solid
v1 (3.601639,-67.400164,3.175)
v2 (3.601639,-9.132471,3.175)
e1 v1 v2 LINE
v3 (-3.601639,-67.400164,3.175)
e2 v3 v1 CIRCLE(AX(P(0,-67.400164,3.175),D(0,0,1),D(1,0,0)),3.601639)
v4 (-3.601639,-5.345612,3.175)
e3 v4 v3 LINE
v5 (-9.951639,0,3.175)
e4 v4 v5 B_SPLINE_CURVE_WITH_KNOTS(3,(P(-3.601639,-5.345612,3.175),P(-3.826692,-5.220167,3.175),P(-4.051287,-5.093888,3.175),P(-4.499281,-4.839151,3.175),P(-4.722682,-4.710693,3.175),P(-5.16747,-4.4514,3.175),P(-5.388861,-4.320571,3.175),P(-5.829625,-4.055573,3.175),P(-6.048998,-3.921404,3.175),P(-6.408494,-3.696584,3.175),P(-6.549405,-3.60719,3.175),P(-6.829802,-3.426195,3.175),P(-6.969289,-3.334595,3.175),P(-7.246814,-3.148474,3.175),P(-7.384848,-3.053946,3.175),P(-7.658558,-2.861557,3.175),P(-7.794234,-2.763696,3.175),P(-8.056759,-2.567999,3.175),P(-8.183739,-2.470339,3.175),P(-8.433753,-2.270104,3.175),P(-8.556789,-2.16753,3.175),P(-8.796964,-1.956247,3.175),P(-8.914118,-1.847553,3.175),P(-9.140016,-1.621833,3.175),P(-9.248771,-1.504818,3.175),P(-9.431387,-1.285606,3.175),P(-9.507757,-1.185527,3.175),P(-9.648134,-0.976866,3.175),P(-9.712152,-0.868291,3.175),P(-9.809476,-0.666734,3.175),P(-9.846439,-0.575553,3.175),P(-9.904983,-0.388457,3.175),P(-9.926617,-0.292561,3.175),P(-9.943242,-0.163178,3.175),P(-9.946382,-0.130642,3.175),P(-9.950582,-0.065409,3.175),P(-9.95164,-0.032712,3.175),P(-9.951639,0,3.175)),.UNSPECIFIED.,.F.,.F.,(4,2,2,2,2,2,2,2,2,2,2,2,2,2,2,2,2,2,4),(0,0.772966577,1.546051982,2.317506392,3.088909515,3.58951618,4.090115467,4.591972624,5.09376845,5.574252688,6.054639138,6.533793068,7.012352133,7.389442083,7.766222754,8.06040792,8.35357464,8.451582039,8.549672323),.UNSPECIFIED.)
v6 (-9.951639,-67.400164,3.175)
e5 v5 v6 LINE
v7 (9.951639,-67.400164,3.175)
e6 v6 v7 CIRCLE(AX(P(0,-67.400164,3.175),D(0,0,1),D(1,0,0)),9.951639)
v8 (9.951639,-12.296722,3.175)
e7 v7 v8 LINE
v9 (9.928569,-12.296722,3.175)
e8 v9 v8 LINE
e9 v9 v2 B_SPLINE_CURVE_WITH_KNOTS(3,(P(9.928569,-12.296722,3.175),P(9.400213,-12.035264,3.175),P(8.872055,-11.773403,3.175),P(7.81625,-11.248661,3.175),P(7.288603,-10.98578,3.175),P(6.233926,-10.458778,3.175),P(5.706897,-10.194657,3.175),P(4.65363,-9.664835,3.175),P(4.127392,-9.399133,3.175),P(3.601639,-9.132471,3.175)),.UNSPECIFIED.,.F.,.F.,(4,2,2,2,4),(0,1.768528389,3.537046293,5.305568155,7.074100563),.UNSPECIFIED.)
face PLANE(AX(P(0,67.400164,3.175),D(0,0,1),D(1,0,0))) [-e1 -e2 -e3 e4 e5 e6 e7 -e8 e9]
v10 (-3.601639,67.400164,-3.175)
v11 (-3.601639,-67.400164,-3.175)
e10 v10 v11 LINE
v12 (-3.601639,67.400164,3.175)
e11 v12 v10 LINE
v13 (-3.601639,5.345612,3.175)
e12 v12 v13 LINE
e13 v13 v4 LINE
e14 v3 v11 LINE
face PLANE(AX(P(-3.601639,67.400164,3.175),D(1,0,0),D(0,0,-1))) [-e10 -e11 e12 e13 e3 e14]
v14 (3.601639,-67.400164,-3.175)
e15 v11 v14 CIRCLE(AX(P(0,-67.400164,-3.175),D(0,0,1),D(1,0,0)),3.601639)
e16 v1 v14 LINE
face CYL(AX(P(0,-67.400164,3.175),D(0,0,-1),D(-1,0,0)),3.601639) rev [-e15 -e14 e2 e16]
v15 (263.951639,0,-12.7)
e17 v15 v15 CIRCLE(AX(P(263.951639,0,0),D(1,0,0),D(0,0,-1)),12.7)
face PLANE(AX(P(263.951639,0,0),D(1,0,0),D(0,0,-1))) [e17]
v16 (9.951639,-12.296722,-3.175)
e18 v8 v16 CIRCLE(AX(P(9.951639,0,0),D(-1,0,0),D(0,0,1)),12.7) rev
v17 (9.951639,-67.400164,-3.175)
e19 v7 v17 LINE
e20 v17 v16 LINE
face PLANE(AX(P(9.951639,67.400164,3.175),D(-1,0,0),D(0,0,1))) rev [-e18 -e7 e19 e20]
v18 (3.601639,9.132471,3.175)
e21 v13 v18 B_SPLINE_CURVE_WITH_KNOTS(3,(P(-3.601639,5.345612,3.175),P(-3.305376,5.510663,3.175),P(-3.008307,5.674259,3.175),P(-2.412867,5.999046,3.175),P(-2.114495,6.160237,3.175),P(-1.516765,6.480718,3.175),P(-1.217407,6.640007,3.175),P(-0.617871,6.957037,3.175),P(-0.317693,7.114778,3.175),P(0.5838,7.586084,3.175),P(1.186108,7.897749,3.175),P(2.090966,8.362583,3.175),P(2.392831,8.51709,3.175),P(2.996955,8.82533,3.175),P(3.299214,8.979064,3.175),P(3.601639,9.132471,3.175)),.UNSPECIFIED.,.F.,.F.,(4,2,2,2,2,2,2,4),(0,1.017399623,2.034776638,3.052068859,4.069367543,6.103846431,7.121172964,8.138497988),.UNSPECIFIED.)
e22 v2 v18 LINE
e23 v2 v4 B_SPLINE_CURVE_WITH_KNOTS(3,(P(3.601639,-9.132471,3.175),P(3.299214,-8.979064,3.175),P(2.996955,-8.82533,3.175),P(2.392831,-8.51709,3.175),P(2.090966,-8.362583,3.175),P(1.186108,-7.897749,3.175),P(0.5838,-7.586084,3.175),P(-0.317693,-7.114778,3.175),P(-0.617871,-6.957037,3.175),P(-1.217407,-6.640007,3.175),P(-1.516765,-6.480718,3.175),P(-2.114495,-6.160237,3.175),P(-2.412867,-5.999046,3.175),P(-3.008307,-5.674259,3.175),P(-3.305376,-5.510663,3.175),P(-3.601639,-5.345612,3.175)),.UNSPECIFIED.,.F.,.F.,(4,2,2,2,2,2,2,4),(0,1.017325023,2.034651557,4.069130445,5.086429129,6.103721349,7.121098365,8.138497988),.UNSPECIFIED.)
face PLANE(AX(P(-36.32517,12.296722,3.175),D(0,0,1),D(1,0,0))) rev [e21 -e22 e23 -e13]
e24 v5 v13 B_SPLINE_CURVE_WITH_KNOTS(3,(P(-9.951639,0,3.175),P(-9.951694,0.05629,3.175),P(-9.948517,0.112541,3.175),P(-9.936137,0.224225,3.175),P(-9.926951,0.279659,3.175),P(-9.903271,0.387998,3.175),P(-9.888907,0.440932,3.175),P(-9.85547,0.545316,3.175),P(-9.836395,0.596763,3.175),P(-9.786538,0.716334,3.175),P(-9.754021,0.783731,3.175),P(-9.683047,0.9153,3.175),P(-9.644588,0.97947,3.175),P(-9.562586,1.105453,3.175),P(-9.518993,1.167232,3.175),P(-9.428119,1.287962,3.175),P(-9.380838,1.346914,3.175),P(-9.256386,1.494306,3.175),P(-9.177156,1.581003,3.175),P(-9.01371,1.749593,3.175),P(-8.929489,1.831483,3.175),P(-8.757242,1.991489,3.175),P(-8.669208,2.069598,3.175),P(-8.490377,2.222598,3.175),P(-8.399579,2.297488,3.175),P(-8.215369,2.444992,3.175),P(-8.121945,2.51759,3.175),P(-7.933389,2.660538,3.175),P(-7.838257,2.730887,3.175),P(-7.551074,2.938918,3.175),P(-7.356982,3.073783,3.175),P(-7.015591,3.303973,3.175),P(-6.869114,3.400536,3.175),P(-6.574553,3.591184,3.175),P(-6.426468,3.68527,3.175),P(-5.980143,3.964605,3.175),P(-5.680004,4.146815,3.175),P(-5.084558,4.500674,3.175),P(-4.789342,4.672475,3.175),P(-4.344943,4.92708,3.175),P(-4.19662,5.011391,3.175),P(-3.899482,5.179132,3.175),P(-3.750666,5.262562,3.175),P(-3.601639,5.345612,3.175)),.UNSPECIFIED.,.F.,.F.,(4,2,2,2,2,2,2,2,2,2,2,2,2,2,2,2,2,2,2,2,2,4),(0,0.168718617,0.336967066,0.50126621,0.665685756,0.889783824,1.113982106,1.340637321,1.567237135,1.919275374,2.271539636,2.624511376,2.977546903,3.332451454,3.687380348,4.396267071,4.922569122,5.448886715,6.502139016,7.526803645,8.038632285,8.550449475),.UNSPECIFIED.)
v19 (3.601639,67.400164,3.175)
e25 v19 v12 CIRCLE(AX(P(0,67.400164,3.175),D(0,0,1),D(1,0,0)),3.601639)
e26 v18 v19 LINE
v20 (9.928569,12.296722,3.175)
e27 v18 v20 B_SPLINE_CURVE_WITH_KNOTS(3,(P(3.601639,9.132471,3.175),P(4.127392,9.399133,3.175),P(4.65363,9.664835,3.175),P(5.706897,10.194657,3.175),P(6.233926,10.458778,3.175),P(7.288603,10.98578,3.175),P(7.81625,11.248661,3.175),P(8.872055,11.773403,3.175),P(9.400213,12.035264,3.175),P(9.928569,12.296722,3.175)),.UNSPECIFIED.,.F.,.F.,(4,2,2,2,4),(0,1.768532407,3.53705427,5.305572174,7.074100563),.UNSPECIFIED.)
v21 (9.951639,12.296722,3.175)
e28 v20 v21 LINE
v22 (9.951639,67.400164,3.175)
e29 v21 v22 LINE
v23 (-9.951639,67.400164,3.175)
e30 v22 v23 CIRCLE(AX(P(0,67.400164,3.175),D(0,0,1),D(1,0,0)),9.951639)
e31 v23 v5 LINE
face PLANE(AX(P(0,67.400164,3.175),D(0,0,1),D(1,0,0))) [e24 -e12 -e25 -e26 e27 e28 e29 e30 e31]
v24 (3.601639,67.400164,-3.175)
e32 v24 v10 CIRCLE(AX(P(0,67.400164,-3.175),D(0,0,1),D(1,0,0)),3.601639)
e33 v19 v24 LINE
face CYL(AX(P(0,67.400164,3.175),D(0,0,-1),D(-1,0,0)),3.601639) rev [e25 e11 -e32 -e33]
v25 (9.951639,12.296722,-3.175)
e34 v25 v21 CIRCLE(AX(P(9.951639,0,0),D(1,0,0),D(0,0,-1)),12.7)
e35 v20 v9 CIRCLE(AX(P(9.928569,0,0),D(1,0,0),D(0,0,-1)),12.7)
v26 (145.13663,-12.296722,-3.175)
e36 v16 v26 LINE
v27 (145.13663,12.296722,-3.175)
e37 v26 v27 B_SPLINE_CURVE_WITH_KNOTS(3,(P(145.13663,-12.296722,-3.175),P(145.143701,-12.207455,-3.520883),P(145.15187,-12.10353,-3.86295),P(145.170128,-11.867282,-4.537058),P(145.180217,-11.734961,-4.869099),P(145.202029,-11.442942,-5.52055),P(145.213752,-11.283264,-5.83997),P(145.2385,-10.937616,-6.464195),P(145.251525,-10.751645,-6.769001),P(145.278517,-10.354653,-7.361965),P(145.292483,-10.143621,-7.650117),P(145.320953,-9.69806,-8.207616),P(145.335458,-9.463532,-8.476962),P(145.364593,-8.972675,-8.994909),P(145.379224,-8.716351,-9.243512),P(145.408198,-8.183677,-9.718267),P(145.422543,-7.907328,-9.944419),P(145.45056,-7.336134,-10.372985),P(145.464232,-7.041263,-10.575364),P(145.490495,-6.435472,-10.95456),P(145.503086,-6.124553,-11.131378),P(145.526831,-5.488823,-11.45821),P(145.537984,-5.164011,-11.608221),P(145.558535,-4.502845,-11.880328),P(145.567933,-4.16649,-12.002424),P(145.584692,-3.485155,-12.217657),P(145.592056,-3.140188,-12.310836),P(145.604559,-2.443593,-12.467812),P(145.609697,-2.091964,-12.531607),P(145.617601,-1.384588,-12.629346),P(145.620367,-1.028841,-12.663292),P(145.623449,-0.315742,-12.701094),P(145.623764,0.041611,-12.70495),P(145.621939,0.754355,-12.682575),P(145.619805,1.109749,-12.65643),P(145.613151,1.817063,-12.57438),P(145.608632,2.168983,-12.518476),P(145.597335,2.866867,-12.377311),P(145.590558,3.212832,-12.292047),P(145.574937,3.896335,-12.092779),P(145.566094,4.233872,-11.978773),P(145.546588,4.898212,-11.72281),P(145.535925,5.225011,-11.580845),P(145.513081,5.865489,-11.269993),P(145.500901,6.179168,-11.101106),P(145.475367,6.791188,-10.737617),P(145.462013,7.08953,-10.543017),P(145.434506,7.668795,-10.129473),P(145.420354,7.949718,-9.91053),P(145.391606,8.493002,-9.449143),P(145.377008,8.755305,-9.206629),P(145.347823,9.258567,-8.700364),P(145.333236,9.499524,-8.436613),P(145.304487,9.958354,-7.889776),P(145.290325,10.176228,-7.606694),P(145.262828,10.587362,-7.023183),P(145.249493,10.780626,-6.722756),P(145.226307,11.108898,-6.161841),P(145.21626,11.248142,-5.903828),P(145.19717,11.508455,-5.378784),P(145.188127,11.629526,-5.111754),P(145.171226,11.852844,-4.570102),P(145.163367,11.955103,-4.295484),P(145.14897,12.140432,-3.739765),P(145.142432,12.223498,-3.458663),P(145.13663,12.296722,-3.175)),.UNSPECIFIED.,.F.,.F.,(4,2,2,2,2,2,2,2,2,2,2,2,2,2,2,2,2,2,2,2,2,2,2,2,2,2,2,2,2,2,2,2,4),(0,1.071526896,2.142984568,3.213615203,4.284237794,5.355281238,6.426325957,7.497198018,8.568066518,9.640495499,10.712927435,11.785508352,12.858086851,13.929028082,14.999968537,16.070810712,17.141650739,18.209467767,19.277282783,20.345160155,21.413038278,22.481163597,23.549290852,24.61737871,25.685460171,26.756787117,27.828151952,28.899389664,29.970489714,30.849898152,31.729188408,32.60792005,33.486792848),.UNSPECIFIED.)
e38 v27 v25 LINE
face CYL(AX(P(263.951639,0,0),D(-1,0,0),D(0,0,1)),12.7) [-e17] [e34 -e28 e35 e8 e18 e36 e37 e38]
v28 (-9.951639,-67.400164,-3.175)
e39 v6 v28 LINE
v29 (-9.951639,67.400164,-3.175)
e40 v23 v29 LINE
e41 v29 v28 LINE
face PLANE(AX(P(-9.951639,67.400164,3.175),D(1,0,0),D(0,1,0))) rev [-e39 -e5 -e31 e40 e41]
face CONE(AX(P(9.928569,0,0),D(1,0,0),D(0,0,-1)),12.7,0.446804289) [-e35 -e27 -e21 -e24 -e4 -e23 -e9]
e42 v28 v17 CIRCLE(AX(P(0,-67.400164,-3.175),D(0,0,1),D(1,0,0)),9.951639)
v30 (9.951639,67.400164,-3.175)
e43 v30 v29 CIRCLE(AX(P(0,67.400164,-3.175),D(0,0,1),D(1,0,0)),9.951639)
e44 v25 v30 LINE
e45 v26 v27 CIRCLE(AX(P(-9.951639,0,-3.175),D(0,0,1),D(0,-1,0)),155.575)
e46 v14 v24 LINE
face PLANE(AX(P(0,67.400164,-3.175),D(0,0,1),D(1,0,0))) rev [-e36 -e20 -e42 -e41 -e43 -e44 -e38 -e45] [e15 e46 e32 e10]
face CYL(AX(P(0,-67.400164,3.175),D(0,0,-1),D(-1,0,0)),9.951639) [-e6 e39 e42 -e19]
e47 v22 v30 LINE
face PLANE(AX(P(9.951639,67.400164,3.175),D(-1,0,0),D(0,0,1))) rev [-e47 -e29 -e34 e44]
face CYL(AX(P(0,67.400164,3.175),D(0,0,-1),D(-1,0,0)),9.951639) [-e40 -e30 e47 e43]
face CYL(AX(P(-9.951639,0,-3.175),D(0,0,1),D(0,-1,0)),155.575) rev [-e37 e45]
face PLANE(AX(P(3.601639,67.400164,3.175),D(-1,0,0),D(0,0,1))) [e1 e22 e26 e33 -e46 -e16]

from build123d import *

# Parameters (mm, degrees)
BOSS_EXTRUDE1_DEPTH = 3.175
SKETCH2_R           = 12.7
BOSS_EXTRUDE2_DEPTH = 254
BOSS_EXTRUDE3_START = 19.90327871
BOSS_EXTRUDE3_DEPTH = 19.90327871
SKETCH15_W          = 9.525
SKETCH15_H          = 155.575
CHAMFER1_SIZE       = 19.880208588
CHAMFER1_SIZE_2     = 9.525


with BuildPart() as part:
    # Sketch1 → Boss-Extrude1 (new, symmetric)
    with BuildSketch(Plane.XY):
        with BuildLine():
            Line((9.951639355, 67.400163523), (9.951639355, -67.400163523))
            ThreePointArc((9.951639355, -67.400163523), (0, -77.351802878), (-9.951639355, -67.400163523))
            Line((-9.951639355, -67.400163523), (-9.951639355, 67.400163523))
            ThreePointArc((-9.951639355, 67.400163523), (0, 77.351802878), (9.951639355, 67.400163523))
        make_face()
        with BuildLine():
            Line((3.601639355, 67.400163523), (3.601639355, -67.400163523))
            ThreePointArc((3.601639355, -67.400163523), (0, -71.001802878), (-3.601639355, -67.400163523))
            Line((-3.601639355, -67.400163523), (-3.601639355, 67.400163523))
            ThreePointArc((-3.601639355, 67.400163523), (0, 71.001802878), (3.601639355, 67.400163523))
        make_face(mode=Mode.SUBTRACT)
    extrude(amount=BOSS_EXTRUDE1_DEPTH, both=True)

    # Sketch2 → Boss-Extrude2 (add)
    with BuildSketch(Plane(origin=(9.951639355, 0, 0), x_dir=(0, 0, -1), z_dir=(1, 0, 0))):
        with Locations(Location((0, 0, 0), (0, 0, 104.477512186))):
            Circle(SKETCH2_R)
    extrude(amount=BOSS_EXTRUDE2_DEPTH)

    # Sketch5 → Boss-Extrude3 (add)
    with BuildSketch(Plane.ZY.offset(-9.951639355).offset(BOSS_EXTRUDE3_START)):
        with BuildLine():
            Line((-3.175, -12.296722124), (-3.175, 12.296722124))
            ThreePointArc((-3.175, 12.296722124), (-12.7, 0), (-3.175, -12.296722124))
        make_face()
        with BuildLine():
            Line((3.175, 12.296722124), (3.175, -12.296722124))
            ThreePointArc((3.175, -12.296722124), (12.7, 0), (3.175, 12.296722124))
        make_face()
    extrude(amount=-BOSS_EXTRUDE3_DEPTH)

    # Sketch15 → Cut-Revolve2 (revolve, cut)
    with BuildSketch(Plane.ZY.offset(9.951639355)):
        with Locations((-7.9375, 77.7875)):
            Rectangle(SKETCH15_W, SKETCH15_H)
    revolve(axis=Axis((-9.951639355, 0, -3.175), (0, 0, -1)), mode=Mode.SUBTRACT)

    # Chamfer1
    # the kernel refuses this chamfer: 19.880208588, 9.525 mm, written as the material it takes off along each edge
    with BuildSketch(Plane(origin=(-9.951639355, 0, 0), x_dir=(0, -0.003141587485879782, -0.9999950652018581), z_dir=(0, 0.9999950652018581, -0.003141587485879782))) as chamfer1_piece_1_section:
        Polygon((12.7, -CHAMFER1_SIZE), (12.7 - CHAMFER1_SIZE_2, 0), (12.7, 0), align=None)
    chamfer1_piece_1 = revolve(axis=Axis((-9.951639355, 0, 0), (-1, 0, 0)), revolution_arc=359.64, mode=Mode.PRIVATE)
    chamfer1_piece_1 = split(chamfer1_piece_1, bisect_by=Plane(origin=(-9.951639355, 0, 3.175), z_dir=(0, 0, 1)), keep=Keep.TOP, mode=Mode.PRIVATE)
    add(chamfer1_piece_1, mode=Mode.SUBTRACT)


solid = part.part
